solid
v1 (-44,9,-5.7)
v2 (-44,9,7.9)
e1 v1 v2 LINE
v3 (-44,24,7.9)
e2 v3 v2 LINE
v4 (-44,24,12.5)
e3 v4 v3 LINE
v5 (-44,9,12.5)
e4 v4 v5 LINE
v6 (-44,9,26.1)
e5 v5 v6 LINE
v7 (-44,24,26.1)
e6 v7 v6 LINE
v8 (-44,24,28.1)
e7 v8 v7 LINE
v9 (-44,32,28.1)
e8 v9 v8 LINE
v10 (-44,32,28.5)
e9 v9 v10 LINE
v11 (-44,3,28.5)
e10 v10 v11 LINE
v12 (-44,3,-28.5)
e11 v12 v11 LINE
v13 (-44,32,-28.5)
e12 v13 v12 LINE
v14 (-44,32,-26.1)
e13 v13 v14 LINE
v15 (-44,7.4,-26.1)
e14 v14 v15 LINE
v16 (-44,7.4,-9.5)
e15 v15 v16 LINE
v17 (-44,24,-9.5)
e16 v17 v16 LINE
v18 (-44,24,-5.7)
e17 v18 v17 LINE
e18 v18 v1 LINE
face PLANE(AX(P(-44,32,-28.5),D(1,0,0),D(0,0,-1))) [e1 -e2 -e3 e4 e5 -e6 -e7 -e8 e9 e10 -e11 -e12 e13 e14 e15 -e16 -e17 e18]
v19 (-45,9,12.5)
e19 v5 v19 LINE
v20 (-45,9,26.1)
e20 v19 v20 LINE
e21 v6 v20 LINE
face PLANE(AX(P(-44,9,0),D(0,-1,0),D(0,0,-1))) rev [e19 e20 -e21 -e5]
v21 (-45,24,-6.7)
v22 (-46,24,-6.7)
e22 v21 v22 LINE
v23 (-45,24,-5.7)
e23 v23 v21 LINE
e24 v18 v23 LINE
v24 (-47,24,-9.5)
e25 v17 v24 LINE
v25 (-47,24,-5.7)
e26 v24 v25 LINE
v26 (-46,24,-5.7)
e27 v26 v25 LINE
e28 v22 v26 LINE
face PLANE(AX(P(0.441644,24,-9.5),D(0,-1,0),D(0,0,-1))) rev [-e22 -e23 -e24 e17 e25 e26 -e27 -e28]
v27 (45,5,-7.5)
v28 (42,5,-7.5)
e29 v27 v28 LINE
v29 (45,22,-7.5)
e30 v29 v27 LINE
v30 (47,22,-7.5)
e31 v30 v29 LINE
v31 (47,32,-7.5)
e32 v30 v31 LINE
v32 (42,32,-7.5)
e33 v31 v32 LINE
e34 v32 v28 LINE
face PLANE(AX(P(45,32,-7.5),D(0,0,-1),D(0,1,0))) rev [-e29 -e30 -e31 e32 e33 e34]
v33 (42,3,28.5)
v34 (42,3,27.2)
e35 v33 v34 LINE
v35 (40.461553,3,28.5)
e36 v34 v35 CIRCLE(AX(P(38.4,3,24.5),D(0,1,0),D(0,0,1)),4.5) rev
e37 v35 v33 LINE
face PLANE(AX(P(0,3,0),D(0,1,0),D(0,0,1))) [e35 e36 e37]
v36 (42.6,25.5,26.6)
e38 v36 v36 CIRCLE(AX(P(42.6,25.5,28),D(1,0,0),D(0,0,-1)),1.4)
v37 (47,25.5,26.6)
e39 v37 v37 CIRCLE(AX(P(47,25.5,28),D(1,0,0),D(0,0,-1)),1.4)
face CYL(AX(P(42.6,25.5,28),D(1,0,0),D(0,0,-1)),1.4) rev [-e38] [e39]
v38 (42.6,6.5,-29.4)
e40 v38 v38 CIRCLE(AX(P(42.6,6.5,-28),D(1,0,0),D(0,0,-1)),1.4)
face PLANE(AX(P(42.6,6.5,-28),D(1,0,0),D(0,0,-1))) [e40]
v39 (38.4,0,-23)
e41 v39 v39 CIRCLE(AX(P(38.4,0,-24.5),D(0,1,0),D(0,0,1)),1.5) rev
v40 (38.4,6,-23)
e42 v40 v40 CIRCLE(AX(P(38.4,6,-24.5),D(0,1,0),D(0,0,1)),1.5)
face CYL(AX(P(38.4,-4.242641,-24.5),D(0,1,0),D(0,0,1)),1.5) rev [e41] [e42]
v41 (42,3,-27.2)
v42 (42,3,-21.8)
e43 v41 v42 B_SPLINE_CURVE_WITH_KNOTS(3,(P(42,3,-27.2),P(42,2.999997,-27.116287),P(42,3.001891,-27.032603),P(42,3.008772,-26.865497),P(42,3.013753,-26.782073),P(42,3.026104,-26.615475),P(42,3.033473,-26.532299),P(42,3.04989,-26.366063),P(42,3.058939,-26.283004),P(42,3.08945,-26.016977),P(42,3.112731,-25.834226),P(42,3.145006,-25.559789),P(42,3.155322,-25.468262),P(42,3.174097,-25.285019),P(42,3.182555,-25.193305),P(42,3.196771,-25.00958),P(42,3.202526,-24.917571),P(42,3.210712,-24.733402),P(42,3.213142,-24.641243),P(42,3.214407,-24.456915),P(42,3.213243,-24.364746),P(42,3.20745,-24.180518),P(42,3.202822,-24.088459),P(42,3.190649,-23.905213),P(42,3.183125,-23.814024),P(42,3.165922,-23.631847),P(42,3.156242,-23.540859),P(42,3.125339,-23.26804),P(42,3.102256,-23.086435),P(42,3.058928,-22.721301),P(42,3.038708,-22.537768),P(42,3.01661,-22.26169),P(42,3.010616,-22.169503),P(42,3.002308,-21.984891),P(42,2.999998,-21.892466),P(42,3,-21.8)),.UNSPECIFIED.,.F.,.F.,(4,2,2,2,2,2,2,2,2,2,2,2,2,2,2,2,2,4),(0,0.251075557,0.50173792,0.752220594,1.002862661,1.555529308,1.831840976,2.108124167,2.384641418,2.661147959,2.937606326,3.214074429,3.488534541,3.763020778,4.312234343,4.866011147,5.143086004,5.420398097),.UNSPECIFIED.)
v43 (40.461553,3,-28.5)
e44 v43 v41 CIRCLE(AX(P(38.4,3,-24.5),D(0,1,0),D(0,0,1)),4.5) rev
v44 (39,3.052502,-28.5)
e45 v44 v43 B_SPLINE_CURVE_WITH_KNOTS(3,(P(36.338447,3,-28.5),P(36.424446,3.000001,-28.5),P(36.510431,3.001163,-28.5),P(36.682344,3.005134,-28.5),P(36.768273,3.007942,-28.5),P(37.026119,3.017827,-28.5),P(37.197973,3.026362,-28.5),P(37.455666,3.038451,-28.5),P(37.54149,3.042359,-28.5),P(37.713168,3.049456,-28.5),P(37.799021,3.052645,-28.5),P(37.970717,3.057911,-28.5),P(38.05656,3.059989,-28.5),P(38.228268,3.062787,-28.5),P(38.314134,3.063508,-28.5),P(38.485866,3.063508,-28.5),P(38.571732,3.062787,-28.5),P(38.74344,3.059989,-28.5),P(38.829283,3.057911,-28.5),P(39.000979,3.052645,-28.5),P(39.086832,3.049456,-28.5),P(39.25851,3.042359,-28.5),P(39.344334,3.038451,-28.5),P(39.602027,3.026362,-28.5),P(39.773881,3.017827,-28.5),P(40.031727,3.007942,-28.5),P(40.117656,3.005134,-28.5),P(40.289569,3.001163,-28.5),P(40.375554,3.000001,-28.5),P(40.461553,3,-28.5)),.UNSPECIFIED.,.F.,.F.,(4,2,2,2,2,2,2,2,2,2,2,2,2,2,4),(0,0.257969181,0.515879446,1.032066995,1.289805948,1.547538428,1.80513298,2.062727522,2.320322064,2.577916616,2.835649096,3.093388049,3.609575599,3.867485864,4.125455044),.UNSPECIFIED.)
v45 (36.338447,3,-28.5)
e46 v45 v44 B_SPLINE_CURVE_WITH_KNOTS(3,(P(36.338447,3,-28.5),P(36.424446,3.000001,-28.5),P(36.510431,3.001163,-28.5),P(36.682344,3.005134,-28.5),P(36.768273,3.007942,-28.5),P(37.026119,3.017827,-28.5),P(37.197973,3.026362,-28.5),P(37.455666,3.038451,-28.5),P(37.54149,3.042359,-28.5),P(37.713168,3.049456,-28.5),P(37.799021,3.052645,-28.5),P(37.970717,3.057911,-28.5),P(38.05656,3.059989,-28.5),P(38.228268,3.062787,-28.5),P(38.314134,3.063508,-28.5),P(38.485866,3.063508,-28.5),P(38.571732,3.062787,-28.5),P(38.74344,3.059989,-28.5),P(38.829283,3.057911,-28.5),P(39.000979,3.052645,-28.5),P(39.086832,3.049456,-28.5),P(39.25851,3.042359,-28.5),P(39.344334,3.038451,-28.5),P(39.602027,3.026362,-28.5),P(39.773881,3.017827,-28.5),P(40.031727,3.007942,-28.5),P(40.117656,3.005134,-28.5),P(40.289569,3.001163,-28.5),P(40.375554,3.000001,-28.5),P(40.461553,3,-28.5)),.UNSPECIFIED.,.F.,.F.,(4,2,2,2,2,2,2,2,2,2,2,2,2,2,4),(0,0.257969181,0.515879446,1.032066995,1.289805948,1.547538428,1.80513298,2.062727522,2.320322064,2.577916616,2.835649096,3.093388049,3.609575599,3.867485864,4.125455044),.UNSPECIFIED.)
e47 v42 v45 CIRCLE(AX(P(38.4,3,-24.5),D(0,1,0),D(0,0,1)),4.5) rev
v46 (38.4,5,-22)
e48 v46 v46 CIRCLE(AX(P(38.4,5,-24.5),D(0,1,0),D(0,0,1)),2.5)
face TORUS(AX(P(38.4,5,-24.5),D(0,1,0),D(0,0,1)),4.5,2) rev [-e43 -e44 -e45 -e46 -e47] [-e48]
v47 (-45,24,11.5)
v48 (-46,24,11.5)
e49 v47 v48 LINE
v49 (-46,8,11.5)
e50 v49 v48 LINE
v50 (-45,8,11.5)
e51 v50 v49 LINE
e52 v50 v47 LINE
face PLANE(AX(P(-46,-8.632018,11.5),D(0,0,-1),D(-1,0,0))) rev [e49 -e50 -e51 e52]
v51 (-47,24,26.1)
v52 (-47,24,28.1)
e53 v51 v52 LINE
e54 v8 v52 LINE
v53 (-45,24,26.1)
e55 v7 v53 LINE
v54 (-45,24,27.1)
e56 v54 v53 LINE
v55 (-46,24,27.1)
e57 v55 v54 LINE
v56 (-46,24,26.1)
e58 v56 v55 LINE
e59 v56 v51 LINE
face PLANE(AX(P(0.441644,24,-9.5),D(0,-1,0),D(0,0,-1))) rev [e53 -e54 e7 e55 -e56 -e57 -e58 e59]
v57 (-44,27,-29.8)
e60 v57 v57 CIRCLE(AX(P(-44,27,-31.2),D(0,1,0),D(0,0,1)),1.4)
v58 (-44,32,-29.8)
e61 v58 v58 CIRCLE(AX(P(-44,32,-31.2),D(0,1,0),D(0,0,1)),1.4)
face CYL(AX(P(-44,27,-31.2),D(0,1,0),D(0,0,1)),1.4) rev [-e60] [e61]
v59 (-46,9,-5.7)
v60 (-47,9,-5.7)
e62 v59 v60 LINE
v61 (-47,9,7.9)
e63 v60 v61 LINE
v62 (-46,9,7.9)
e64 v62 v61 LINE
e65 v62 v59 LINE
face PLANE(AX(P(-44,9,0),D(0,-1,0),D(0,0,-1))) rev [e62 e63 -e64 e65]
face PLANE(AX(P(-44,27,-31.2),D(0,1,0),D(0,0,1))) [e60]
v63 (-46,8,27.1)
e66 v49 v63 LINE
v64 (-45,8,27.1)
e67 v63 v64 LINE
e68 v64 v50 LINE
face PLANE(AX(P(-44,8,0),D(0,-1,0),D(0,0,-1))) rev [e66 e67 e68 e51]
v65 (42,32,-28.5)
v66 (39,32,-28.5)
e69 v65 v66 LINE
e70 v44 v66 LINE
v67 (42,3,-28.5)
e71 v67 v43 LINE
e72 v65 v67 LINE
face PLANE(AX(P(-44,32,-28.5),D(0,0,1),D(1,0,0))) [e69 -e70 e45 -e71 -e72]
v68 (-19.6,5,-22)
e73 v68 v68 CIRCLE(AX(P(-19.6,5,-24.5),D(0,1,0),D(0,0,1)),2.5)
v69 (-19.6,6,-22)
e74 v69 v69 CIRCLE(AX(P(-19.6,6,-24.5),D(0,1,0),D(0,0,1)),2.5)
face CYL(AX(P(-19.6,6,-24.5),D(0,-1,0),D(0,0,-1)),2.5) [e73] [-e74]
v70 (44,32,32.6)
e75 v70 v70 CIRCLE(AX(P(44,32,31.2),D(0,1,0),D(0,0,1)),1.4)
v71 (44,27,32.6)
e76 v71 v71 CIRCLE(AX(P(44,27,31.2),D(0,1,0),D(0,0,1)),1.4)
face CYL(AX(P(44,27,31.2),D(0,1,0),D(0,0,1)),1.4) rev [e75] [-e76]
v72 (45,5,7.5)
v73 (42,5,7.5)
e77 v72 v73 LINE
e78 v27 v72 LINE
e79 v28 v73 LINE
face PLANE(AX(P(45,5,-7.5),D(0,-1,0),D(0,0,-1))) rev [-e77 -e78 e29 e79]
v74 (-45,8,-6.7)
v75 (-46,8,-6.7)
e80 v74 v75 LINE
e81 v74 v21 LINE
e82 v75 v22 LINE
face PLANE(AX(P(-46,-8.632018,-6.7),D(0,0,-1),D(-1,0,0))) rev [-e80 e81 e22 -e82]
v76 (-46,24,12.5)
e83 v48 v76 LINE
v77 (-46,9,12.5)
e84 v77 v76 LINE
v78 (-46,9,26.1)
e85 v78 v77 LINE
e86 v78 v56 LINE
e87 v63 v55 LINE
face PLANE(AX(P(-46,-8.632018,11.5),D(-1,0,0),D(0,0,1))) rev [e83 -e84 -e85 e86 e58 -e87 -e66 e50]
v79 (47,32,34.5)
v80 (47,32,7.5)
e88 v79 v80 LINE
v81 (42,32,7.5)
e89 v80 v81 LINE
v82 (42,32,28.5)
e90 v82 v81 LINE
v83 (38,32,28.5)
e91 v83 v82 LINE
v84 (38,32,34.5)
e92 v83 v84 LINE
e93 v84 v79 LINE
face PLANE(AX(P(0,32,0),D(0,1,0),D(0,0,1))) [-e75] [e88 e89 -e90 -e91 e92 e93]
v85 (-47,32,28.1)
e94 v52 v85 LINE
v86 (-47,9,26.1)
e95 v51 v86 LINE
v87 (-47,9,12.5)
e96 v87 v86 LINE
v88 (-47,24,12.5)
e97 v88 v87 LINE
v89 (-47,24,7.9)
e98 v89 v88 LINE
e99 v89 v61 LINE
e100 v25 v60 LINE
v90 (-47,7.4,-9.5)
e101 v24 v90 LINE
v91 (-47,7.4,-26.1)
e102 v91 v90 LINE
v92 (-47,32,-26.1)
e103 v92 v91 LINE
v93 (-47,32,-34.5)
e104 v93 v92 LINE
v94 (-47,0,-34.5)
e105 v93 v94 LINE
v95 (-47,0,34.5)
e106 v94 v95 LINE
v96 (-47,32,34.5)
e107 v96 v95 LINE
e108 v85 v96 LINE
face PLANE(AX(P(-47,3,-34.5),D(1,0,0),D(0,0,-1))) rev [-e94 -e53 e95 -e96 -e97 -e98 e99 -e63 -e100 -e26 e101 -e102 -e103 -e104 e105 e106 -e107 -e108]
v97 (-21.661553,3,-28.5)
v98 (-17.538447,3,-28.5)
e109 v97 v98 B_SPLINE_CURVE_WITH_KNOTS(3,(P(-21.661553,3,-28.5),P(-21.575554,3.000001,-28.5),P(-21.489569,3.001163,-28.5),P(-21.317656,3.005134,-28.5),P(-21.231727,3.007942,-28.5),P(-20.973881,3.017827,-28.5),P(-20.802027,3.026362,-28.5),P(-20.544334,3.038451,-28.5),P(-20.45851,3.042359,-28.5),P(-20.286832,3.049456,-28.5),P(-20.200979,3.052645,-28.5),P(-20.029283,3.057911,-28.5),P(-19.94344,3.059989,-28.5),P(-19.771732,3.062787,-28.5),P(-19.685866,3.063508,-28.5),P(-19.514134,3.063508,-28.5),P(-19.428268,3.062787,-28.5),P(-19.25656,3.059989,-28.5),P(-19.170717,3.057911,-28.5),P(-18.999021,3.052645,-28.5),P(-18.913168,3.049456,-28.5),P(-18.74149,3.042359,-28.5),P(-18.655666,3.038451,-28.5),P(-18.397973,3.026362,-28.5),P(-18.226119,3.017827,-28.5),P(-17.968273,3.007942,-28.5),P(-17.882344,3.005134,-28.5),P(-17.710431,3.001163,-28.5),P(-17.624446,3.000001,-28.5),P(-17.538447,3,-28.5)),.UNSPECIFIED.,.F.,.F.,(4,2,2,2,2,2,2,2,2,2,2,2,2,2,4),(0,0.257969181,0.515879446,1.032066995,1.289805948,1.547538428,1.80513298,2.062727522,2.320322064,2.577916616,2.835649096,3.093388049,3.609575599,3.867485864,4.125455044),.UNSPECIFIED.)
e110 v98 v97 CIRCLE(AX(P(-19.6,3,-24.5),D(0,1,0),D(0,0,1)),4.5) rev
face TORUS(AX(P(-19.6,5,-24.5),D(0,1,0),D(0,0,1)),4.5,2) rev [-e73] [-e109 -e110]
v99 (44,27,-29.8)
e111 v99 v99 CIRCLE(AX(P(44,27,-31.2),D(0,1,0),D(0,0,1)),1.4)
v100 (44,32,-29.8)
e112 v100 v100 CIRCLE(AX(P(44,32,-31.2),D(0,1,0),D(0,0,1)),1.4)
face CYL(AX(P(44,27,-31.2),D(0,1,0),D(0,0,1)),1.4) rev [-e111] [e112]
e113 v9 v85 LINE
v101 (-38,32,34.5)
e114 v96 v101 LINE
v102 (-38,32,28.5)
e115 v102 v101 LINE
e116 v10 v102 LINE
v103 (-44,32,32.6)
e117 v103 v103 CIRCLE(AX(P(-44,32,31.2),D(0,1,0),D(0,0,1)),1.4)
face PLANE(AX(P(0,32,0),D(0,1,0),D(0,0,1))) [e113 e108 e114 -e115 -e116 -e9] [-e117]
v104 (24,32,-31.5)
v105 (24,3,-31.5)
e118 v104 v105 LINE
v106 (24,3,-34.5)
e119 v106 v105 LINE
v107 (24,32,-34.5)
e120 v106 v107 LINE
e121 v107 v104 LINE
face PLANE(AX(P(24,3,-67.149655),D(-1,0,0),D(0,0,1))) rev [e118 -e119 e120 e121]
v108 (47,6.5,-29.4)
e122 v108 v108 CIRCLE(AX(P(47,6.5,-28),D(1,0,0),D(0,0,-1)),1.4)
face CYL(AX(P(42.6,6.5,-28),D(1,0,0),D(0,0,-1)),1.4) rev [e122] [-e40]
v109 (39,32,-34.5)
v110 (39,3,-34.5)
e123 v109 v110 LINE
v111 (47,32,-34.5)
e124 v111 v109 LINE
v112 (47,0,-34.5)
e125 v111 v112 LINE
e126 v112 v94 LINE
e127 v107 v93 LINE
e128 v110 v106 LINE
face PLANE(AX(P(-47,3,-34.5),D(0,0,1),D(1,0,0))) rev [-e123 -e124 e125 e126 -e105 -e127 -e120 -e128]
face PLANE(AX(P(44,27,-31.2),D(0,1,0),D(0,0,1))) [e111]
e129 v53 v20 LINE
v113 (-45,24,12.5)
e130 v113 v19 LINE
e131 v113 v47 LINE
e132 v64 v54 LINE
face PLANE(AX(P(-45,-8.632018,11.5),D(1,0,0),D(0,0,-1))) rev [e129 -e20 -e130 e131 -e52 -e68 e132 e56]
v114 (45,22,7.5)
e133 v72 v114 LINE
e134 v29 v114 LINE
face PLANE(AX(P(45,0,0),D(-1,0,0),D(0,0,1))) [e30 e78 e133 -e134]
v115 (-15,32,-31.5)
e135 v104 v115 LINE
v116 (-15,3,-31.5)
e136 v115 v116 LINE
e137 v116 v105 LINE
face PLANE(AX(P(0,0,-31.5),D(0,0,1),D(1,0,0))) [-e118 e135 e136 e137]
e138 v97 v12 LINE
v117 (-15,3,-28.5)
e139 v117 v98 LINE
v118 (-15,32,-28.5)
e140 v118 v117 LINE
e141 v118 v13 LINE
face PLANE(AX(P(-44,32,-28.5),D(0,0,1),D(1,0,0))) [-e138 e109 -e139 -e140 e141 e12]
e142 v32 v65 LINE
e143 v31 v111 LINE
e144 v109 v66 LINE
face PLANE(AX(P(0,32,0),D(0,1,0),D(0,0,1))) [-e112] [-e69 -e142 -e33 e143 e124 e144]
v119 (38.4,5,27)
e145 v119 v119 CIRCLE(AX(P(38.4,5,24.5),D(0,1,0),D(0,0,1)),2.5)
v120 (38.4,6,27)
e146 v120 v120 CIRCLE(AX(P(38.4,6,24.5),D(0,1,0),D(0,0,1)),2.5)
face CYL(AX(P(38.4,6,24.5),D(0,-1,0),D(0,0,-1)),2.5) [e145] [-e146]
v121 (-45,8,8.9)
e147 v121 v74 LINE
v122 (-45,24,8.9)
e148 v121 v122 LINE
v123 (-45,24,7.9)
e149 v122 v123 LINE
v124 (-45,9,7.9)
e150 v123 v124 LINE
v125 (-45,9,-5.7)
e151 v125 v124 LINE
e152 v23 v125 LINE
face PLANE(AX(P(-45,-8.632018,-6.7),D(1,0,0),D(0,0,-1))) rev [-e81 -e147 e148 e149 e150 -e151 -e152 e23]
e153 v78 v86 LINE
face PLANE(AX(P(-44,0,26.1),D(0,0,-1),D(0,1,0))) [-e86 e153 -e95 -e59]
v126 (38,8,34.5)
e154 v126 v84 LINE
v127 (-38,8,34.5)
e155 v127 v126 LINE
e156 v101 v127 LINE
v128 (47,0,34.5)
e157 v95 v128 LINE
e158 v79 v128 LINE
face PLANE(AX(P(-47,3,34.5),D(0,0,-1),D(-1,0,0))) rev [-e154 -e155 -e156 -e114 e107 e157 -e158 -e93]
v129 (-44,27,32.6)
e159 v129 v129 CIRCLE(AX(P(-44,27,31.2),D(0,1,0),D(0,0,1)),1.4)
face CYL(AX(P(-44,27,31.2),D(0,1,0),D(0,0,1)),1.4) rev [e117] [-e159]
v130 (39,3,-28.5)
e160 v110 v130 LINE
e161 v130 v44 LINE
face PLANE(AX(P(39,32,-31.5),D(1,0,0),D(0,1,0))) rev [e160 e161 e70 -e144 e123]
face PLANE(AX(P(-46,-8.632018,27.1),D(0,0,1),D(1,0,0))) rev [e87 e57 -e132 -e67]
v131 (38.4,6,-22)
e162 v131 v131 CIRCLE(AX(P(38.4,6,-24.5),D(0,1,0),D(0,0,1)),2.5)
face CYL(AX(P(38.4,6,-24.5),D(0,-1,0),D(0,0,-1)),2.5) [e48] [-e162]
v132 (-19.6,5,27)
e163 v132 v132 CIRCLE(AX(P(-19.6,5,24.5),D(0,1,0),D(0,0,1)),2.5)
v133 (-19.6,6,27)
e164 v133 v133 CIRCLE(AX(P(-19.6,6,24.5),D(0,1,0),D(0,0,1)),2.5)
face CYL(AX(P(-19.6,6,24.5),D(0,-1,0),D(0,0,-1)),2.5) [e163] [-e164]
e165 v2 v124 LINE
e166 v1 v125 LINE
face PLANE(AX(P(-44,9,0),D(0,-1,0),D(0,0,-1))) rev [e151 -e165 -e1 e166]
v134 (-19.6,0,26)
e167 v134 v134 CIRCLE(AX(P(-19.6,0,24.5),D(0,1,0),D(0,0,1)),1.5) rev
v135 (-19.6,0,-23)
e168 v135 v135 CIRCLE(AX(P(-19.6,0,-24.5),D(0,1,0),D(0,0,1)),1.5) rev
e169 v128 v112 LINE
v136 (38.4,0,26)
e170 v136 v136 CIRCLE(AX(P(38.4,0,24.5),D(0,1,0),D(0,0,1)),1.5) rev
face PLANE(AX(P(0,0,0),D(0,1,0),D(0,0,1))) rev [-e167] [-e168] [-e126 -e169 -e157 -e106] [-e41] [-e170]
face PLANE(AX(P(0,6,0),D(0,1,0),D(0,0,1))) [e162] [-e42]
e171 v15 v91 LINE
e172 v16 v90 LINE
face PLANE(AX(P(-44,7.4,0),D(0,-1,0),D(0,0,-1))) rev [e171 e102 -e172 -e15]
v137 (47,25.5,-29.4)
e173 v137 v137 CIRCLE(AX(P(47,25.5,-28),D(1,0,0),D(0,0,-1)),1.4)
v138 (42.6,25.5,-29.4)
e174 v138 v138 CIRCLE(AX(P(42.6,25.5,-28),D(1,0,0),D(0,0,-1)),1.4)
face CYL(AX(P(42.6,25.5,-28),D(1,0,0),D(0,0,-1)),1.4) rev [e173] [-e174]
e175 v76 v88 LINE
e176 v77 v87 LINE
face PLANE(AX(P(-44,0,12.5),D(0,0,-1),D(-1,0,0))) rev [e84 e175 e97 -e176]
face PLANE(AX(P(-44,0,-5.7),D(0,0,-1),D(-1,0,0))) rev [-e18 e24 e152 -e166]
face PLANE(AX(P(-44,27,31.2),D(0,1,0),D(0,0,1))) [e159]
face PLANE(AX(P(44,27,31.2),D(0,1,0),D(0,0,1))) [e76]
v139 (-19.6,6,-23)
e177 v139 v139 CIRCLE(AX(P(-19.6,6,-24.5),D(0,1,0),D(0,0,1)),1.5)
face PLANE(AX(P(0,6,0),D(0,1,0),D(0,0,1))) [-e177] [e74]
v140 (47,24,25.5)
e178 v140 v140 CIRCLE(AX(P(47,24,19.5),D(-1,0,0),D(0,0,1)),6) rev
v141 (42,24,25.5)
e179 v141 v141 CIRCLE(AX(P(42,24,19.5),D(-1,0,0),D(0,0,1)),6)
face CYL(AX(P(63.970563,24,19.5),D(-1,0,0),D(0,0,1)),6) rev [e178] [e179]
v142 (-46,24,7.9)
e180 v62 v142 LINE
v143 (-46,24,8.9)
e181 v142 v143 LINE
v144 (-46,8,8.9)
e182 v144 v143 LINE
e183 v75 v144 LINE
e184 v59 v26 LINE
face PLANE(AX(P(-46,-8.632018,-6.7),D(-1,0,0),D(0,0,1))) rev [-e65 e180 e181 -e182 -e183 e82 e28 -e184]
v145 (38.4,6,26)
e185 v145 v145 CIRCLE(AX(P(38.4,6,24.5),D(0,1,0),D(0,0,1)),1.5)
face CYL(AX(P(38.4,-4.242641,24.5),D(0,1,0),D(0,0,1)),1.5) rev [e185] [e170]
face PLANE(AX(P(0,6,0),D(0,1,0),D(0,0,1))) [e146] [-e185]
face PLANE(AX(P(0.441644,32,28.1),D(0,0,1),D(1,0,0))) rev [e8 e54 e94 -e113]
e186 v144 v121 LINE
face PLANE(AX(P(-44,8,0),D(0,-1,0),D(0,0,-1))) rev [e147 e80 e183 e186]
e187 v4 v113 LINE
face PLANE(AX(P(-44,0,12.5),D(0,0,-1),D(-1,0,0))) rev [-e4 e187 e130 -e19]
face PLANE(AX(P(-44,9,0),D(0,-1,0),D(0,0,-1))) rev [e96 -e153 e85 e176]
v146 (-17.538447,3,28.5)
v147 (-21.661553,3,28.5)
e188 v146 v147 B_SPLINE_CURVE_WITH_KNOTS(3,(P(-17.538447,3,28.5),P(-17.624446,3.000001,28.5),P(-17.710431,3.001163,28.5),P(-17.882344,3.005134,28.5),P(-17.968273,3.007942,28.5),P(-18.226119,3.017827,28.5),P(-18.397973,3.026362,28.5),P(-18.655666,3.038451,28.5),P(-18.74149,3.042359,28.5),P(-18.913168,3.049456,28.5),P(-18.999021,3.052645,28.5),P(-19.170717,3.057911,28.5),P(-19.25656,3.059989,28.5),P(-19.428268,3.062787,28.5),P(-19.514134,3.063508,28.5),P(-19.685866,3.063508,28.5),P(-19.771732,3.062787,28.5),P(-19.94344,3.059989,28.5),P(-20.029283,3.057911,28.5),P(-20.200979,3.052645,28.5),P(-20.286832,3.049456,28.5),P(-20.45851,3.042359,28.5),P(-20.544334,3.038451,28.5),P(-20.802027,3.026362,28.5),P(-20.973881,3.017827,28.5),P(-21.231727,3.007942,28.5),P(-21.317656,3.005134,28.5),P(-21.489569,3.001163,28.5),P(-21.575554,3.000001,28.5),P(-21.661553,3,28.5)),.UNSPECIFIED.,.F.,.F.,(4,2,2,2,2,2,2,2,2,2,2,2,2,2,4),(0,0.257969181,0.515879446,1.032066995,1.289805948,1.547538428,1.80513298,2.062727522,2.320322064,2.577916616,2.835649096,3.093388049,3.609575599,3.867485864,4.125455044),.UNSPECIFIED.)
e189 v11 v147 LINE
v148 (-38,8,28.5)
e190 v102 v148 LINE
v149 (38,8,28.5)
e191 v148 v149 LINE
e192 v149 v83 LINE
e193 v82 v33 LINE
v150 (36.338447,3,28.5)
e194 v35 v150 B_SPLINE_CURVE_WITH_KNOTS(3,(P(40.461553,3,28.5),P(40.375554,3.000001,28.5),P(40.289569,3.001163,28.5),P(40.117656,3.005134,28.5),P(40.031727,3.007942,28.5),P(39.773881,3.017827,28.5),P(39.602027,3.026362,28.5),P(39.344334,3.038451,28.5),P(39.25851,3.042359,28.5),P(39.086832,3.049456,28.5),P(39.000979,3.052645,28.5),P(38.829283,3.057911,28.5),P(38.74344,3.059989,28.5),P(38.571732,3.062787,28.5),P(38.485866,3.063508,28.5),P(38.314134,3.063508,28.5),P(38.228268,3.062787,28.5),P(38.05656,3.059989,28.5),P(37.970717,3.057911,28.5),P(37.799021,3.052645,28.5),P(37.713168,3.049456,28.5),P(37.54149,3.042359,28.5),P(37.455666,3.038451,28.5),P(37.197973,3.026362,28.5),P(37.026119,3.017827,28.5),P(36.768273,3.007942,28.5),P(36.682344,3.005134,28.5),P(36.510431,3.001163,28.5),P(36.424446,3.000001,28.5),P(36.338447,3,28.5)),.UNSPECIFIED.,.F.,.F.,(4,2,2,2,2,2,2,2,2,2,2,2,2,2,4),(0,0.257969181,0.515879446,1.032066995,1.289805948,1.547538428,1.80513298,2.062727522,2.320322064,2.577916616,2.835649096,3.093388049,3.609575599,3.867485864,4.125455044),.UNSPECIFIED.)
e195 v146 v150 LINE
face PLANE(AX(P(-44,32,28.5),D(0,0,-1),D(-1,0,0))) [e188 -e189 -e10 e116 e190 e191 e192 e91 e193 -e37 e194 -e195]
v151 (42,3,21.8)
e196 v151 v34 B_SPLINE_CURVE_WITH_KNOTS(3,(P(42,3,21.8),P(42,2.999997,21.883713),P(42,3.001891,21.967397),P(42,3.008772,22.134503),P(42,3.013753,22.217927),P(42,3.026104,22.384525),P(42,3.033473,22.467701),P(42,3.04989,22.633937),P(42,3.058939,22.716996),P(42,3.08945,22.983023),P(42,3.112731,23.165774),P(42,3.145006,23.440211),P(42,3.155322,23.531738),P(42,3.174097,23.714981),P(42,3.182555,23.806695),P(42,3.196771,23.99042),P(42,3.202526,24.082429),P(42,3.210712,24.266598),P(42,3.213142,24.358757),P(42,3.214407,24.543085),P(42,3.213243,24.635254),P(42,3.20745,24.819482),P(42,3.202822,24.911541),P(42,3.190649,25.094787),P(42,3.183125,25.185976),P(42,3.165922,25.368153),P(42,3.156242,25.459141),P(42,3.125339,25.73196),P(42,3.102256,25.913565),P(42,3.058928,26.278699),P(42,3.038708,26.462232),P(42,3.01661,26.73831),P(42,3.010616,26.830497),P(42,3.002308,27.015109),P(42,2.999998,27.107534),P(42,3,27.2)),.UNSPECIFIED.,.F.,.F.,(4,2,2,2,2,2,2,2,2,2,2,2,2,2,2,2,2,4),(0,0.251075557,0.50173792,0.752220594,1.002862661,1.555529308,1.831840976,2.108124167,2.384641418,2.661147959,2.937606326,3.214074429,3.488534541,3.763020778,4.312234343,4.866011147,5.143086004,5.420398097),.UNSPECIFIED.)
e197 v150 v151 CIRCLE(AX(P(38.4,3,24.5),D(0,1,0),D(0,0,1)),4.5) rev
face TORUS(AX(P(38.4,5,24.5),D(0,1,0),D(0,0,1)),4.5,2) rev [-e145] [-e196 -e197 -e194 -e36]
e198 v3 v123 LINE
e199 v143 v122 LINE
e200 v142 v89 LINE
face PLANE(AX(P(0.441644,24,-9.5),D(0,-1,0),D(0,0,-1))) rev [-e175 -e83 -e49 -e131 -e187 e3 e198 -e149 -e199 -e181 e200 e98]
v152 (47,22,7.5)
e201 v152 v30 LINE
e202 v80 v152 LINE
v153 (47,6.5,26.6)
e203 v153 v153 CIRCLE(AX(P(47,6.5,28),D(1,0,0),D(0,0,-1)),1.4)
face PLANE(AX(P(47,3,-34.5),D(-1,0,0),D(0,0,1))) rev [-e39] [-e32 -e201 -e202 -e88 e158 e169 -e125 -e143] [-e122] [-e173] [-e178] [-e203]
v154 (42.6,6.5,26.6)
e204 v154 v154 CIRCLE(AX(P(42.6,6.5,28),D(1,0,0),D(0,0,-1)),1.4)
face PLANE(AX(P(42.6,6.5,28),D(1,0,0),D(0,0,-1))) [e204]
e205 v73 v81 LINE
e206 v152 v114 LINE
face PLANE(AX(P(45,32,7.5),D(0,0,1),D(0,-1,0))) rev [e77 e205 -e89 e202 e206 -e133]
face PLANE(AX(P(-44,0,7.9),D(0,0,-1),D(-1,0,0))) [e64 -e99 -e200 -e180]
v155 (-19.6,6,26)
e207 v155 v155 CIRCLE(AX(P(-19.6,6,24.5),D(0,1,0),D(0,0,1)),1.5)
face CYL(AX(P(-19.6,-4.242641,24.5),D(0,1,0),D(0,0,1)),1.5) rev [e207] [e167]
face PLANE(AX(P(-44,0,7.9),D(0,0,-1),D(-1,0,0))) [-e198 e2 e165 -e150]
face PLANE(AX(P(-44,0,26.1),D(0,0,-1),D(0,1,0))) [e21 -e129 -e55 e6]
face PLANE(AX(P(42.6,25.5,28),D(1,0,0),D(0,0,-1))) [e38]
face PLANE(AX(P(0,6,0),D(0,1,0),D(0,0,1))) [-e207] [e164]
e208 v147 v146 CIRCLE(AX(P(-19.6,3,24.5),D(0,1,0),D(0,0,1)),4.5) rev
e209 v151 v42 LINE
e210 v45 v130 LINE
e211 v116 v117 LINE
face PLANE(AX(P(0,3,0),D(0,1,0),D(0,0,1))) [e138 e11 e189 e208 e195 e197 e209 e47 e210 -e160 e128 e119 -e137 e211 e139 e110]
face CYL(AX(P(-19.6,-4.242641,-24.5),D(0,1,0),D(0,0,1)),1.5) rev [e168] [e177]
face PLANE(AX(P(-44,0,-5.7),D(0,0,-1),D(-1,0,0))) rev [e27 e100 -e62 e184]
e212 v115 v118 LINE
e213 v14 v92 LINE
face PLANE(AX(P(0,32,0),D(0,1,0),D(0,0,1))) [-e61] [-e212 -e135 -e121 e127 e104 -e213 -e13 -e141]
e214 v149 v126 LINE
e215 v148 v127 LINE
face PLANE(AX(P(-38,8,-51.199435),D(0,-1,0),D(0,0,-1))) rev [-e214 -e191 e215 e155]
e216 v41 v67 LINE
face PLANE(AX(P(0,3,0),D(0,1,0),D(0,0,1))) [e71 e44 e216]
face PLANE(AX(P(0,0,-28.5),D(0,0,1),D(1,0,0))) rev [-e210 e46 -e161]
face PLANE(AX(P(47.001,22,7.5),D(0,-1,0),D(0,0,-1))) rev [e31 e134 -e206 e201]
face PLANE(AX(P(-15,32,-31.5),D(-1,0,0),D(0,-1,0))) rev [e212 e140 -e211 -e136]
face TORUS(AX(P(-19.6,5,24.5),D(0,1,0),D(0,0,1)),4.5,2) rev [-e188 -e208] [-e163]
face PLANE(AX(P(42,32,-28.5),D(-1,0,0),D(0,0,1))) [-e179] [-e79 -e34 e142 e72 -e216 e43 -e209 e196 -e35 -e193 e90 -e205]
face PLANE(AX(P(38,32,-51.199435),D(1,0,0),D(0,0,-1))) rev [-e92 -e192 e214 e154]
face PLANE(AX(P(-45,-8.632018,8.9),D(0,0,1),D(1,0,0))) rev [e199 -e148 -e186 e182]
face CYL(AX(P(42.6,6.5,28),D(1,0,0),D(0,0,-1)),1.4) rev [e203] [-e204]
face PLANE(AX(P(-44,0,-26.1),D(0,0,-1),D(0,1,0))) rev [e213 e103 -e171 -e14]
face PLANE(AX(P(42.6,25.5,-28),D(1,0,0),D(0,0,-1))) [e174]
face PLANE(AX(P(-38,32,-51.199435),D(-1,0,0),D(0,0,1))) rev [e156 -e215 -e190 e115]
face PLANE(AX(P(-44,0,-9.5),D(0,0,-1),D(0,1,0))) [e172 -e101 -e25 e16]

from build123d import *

# Parameters (mm, degrees)
SKETCH1_W                = 94
SKETCH1_H                = 69
PI_BASE_DEPTH            = 3
SKETCH2_W                = 94
SKETCH2_H                = 69
SKETCH2_W_2              = 86
SKETCH2_H_2              = 57
PI_WALLS_DEPTH           = 29
SKETCH4_R                = 2.5
STAND_OFFS_DEPTH         = 3
SKETCH6_R                = 1.5
PI_MOUNT_HOLES_DEPTH     = 6
STANDOFF_FILLET_R        = 2
SKETCH5_W                = 54
SKETCH5_H                = 29
HDMI_AUX_CUT_DEPTH       = 3
SKETCH10_W               = 15
SKETCH10_H               = 29
PWR_CUT_THROUGH_DEPTH    = 3
SKETCH3_W                = 16.6
SKETCH3_H                = 24.6
SKETCH3_W_2              = 13.6
SKETCH3_H_2              = 23
ETH_USB_CUT_DEPTH        = 3
SKETCH8_W                = 1
SKETCH8_H                = 15.6
USB_FLANGE_CUT_DEPTH     = 24
SKETCH16_W               = 15
SKETCH16_H               = 27
SD_CUT_DEPTH             = 3
SKETCH12_R               = 1.4
PCA_MOUNTING_CUT_DEPTH   = 4.4
SKETCH13_R               = 6
CAP_WIRE_HOLE_DEPTH      = 5
SKETCH15_W               = 76
SKETCH15_H               = 24
SIDE_PANEL_CUT_DEPTH     = 6
USB_TOP_TRIM_REACH       = 107.12
SKETCH17_W               = 37.6
SKETCH17_H               = 8
SKETCH18_R               = 1.4
TOP_MOUNTING_HOLES_DEPTH = 5
PCA_POWER_CUT_REACH      = 105.336
SKETCH19_W               = 15
SKETCH19_H               = 10


with BuildPart() as part:
    # Sketch1 → pi_base (new body)
    with BuildSketch(Plane(origin=(0, 0, 0), x_dir=(1, 0, 0), z_dir=(0, 1, 0))):
        Rectangle(SKETCH1_W, SKETCH1_H)
    extrude(amount=PI_BASE_DEPTH)

    # Sketch2 → pi_walls (add)
    with BuildSketch(Plane(origin=(0, 3, 0), x_dir=(1, 0, 0), z_dir=(0, 1, 0))):
        Rectangle(SKETCH2_W, SKETCH2_H)
        with Locations((-1, 0)):
            Rectangle(SKETCH2_W_2, SKETCH2_H_2, mode=Mode.SUBTRACT)
    extrude(amount=PI_WALLS_DEPTH)

    # Sketch4 → stand_offs (add)
    with BuildSketch(Plane(origin=(0, 3, 0), x_dir=(1, 0, 0), z_dir=(0, 1, 0))):
        with Locations(Location((-19.6, 24.5, 0), (0, 0, 270))):
            Circle(SKETCH4_R)
        with Locations(Location((38.4, 24.5, 0), (0, 0, 270))):
            Circle(SKETCH4_R)
        with Locations(Location((-19.6, -24.5, 0), (0, 0, 270))):
            Circle(SKETCH4_R)
        with Locations(Location((38.4, -24.5, 0), (0, 0, 270))):
            Circle(SKETCH4_R)
    extrude(amount=STAND_OFFS_DEPTH)

    # Sketch6 → pi_mount_holes (cut)
    with BuildSketch(Plane(origin=(0, 6, 0), x_dir=(1, 0, 0), z_dir=(0, 1, 0))):
        with Locations(Location((-19.6, 24.5, 0), (0, 0, 270))):
            Circle(SKETCH6_R)
        with Locations(Location((38.4, 24.5, 0), (0, 0, 270))):
            Circle(SKETCH6_R)
        with Locations(Location((-19.6, -24.5, 0), (0, 0, 270))):
            Circle(SKETCH6_R)
        with Locations(Location((38.4, -24.5, 0), (0, 0, 270))):
            Circle(SKETCH6_R)
    extrude(amount=-PI_MOUNT_HOLES_DEPTH, mode=Mode.SUBTRACT)

    # standoff_fillet
    # the kernel refuses this fillet: 2 mm, written as the material it adds along each edge
    with BuildSketch(Plane(origin=(-19.6, 3, -24.5), x_dir=(0, 0, 1), z_dir=(-1, 0, 0))) as standoff_fillet_piece_1:
        with BuildLine():
            CenterArc((2.5 + STANDOFF_FILLET_R, STANDOFF_FILLET_R), STANDOFF_FILLET_R, 180, 90)
            Line((2.5, STANDOFF_FILLET_R), (2.5, 0))
            Line((2.5, 0), (2.5 + STANDOFF_FILLET_R, 0))
        make_face()
    revolve(axis=Axis((-19.6, 3, -24.5), (0, 1, 0)))
    with BuildSketch(Plane(origin=(38.4, 3, -24.5), x_dir=(0, 0, 1), z_dir=(-1, 0, 0))) as standoff_fillet_piece_2:
        with BuildLine():
            CenterArc((2.5 + STANDOFF_FILLET_R, STANDOFF_FILLET_R), STANDOFF_FILLET_R, 180, 90)
            Line((2.5, STANDOFF_FILLET_R), (2.5, 0))
            Line((2.5, 0), (2.5 + STANDOFF_FILLET_R, 0))
        make_face()
    revolve(axis=Axis((38.4, 3, -24.5), (0, 1, 0)))
    with BuildSketch(Plane(origin=(38.4, 3, 24.5), x_dir=(0, 0, 1), z_dir=(-1, 0, 0))) as standoff_fillet_piece_3:
        with BuildLine():
            CenterArc((2.5 + STANDOFF_FILLET_R, STANDOFF_FILLET_R), STANDOFF_FILLET_R, 180, 90)
            Line((2.5, STANDOFF_FILLET_R), (2.5, 0))
            Line((2.5, 0), (2.5 + STANDOFF_FILLET_R, 0))
        make_face()
    revolve(axis=Axis((38.4, 3, 24.5), (0, 1, 0)))
    with BuildSketch(Plane(origin=(-19.6, 3, 24.5), x_dir=(0, 0, 1), z_dir=(-1, 0, 0))) as standoff_fillet_piece_4:
        with BuildLine():
            CenterArc((2.5 + STANDOFF_FILLET_R, STANDOFF_FILLET_R), STANDOFF_FILLET_R, 180, 90)
            Line((2.5, STANDOFF_FILLET_R), (2.5, 0))
            Line((2.5, 0), (2.5 + STANDOFF_FILLET_R, 0))
        make_face()
    revolve(axis=Axis((-19.6, 3, 24.5), (0, 1, 0)))

    # Sketch5 → hdmi_aux_cut (cut)
    with BuildSketch(Plane.XY.offset(-28.5)):
        with Locations((12, 17.5)):
            Rectangle(SKETCH5_W, SKETCH5_H)
    extrude(amount=-HDMI_AUX_CUT_DEPTH, mode=Mode.SUBTRACT)

    # Sketch10 → pwr_cut_through (cut)
    with BuildSketch(Plane.XY.offset(-31.5)):
        with Locations((31.5, 17.5)):
            Rectangle(SKETCH10_W, SKETCH10_H)
    extrude(amount=-PWR_CUT_THROUGH_DEPTH, mode=Mode.SUBTRACT)

    # Sketch3 → eth_usb_cut (cut)
    with BuildSketch(Plane.ZY.offset(47)):
        with Locations((-17.8, 19.7)):
            Rectangle(SKETCH3_W, SKETCH3_H)
        with Locations((1.1, 20.5)):
            Rectangle(SKETCH3_W_2, SKETCH3_H_2)
        with Locations((19.3, 20.5)):
            Rectangle(SKETCH3_W_2, SKETCH3_H_2)
    extrude(amount=-ETH_USB_CUT_DEPTH, mode=Mode.SUBTRACT)

    # Sketch8 → usb_flange_cut (cut)
    with BuildSketch(Plane(origin=(0, 32, 0), x_dir=(1, 0, 0), z_dir=(0, 1, 0))):
        with Locations((-45.5, -1.1)):
            Rectangle(SKETCH8_W, SKETCH8_H)
        with Locations((-45.5, -19.3)):
            Rectangle(SKETCH8_W, SKETCH8_H)
    extrude(amount=-USB_FLANGE_CUT_DEPTH, mode=Mode.SUBTRACT)

    # Sketch16 → sd_cut (cut)
    with BuildSketch(Plane.ZY.offset(-42)):
        with Locations((0, 18.5)):
            Rectangle(SKETCH16_W, SKETCH16_H)
    extrude(amount=-SD_CUT_DEPTH, mode=Mode.SUBTRACT)

    # Sketch12 → pca_mounting_cut (cut)
    with BuildSketch(Plane(origin=(47, 0, 0), x_dir=(0, 0, -1), z_dir=(1, 0, 0))):
        with Locations((-28, 25.5)):
            Circle(SKETCH12_R)
        with Locations((-28, 6.5)):
            Circle(SKETCH12_R)
        with Locations((28, 6.5)):
            Circle(SKETCH12_R)
        with Locations((28, 25.5)):
            Circle(SKETCH12_R)
    extrude(amount=-PCA_MOUNTING_CUT_DEPTH, mode=Mode.SUBTRACT)

    # Sketch13 → cap_wire_hole (cut)
    with BuildSketch(Plane.ZY.offset(-42)):
        with Locations((19.5, 24)):
            Circle(SKETCH13_R)
    extrude(amount=-CAP_WIRE_HOLE_DEPTH, mode=Mode.SUBTRACT)

    # Sketch15 → side_panel_cut (cut)
    with BuildSketch(Plane.XY.offset(34.5)):
        with Locations((0, 20)):
            Rectangle(SKETCH15_W, SKETCH15_H)
    extrude(amount=-SIDE_PANEL_CUT_DEPTH, mode=Mode.SUBTRACT)

    # usb_top_trim: up to this face of the body (flat: up to its plane)
    usb_top_trim_end = Plane(part.part.faces().sort_by_distance((-38, 20, 31.5))[0])
    # Sketch17 → usb_top_trim (cut, up to the picked face)
    with BuildSketch(Plane.ZY.offset(47), mode=Mode.PRIVATE) as usb_top_trim_sk1:
        with Locations((9.3, 28)):
            Rectangle(SKETCH17_W, SKETCH17_H)
    usb_top_trim_tool1 = split(extrude(usb_top_trim_sk1.sketch, amount=-USB_TOP_TRIM_REACH, mode=Mode.PRIVATE), bisect_by=usb_top_trim_end, keep=Keep.BOTH, mode=Mode.PRIVATE)
    add(usb_top_trim_tool1.solids().sort_by(Axis((-47, 28, 9.3), (1, 0, 0)))[0], mode=Mode.SUBTRACT)

    # Sketch18 → top_mounting_holes (cut)
    with BuildSketch(Plane(origin=(0, 32, 0), x_dir=(1, 0, 0), z_dir=(0, 1, 0))):
        with Locations(Location((-44, 31.2, 0), (0, 0, 270))):
            Circle(SKETCH18_R)
        with Locations(Location((44, 31.2, 0), (0, 0, 270))):
            Circle(SKETCH18_R)
        with Locations(Location((44, -31.2, 0), (0, 0, 270))):
            Circle(SKETCH18_R)
        with Locations(Location((-44, -31.2, 0), (0, 0, 270))):
            Circle(SKETCH18_R)
    extrude(amount=-TOP_MOUNTING_HOLES_DEPTH, mode=Mode.SUBTRACT)

    # Sketch19 → pca_power_cut (cut, up to next)
    with BuildSketch(Plane.ZY.offset(-45), mode=Mode.PRIVATE) as pca_power_cut_sk1:
        with Locations((0, 27)):
            Rectangle(SKETCH19_W, SKETCH19_H)
    pca_power_cut_tool1 = extrude(pca_power_cut_sk1.sketch, amount=-PCA_POWER_CUT_REACH, mode=Mode.PRIVATE) & part.part
    add(pca_power_cut_tool1.solids().sort_by_distance((45, 27, 0))[0], mode=Mode.SUBTRACT)


solid = part.part
